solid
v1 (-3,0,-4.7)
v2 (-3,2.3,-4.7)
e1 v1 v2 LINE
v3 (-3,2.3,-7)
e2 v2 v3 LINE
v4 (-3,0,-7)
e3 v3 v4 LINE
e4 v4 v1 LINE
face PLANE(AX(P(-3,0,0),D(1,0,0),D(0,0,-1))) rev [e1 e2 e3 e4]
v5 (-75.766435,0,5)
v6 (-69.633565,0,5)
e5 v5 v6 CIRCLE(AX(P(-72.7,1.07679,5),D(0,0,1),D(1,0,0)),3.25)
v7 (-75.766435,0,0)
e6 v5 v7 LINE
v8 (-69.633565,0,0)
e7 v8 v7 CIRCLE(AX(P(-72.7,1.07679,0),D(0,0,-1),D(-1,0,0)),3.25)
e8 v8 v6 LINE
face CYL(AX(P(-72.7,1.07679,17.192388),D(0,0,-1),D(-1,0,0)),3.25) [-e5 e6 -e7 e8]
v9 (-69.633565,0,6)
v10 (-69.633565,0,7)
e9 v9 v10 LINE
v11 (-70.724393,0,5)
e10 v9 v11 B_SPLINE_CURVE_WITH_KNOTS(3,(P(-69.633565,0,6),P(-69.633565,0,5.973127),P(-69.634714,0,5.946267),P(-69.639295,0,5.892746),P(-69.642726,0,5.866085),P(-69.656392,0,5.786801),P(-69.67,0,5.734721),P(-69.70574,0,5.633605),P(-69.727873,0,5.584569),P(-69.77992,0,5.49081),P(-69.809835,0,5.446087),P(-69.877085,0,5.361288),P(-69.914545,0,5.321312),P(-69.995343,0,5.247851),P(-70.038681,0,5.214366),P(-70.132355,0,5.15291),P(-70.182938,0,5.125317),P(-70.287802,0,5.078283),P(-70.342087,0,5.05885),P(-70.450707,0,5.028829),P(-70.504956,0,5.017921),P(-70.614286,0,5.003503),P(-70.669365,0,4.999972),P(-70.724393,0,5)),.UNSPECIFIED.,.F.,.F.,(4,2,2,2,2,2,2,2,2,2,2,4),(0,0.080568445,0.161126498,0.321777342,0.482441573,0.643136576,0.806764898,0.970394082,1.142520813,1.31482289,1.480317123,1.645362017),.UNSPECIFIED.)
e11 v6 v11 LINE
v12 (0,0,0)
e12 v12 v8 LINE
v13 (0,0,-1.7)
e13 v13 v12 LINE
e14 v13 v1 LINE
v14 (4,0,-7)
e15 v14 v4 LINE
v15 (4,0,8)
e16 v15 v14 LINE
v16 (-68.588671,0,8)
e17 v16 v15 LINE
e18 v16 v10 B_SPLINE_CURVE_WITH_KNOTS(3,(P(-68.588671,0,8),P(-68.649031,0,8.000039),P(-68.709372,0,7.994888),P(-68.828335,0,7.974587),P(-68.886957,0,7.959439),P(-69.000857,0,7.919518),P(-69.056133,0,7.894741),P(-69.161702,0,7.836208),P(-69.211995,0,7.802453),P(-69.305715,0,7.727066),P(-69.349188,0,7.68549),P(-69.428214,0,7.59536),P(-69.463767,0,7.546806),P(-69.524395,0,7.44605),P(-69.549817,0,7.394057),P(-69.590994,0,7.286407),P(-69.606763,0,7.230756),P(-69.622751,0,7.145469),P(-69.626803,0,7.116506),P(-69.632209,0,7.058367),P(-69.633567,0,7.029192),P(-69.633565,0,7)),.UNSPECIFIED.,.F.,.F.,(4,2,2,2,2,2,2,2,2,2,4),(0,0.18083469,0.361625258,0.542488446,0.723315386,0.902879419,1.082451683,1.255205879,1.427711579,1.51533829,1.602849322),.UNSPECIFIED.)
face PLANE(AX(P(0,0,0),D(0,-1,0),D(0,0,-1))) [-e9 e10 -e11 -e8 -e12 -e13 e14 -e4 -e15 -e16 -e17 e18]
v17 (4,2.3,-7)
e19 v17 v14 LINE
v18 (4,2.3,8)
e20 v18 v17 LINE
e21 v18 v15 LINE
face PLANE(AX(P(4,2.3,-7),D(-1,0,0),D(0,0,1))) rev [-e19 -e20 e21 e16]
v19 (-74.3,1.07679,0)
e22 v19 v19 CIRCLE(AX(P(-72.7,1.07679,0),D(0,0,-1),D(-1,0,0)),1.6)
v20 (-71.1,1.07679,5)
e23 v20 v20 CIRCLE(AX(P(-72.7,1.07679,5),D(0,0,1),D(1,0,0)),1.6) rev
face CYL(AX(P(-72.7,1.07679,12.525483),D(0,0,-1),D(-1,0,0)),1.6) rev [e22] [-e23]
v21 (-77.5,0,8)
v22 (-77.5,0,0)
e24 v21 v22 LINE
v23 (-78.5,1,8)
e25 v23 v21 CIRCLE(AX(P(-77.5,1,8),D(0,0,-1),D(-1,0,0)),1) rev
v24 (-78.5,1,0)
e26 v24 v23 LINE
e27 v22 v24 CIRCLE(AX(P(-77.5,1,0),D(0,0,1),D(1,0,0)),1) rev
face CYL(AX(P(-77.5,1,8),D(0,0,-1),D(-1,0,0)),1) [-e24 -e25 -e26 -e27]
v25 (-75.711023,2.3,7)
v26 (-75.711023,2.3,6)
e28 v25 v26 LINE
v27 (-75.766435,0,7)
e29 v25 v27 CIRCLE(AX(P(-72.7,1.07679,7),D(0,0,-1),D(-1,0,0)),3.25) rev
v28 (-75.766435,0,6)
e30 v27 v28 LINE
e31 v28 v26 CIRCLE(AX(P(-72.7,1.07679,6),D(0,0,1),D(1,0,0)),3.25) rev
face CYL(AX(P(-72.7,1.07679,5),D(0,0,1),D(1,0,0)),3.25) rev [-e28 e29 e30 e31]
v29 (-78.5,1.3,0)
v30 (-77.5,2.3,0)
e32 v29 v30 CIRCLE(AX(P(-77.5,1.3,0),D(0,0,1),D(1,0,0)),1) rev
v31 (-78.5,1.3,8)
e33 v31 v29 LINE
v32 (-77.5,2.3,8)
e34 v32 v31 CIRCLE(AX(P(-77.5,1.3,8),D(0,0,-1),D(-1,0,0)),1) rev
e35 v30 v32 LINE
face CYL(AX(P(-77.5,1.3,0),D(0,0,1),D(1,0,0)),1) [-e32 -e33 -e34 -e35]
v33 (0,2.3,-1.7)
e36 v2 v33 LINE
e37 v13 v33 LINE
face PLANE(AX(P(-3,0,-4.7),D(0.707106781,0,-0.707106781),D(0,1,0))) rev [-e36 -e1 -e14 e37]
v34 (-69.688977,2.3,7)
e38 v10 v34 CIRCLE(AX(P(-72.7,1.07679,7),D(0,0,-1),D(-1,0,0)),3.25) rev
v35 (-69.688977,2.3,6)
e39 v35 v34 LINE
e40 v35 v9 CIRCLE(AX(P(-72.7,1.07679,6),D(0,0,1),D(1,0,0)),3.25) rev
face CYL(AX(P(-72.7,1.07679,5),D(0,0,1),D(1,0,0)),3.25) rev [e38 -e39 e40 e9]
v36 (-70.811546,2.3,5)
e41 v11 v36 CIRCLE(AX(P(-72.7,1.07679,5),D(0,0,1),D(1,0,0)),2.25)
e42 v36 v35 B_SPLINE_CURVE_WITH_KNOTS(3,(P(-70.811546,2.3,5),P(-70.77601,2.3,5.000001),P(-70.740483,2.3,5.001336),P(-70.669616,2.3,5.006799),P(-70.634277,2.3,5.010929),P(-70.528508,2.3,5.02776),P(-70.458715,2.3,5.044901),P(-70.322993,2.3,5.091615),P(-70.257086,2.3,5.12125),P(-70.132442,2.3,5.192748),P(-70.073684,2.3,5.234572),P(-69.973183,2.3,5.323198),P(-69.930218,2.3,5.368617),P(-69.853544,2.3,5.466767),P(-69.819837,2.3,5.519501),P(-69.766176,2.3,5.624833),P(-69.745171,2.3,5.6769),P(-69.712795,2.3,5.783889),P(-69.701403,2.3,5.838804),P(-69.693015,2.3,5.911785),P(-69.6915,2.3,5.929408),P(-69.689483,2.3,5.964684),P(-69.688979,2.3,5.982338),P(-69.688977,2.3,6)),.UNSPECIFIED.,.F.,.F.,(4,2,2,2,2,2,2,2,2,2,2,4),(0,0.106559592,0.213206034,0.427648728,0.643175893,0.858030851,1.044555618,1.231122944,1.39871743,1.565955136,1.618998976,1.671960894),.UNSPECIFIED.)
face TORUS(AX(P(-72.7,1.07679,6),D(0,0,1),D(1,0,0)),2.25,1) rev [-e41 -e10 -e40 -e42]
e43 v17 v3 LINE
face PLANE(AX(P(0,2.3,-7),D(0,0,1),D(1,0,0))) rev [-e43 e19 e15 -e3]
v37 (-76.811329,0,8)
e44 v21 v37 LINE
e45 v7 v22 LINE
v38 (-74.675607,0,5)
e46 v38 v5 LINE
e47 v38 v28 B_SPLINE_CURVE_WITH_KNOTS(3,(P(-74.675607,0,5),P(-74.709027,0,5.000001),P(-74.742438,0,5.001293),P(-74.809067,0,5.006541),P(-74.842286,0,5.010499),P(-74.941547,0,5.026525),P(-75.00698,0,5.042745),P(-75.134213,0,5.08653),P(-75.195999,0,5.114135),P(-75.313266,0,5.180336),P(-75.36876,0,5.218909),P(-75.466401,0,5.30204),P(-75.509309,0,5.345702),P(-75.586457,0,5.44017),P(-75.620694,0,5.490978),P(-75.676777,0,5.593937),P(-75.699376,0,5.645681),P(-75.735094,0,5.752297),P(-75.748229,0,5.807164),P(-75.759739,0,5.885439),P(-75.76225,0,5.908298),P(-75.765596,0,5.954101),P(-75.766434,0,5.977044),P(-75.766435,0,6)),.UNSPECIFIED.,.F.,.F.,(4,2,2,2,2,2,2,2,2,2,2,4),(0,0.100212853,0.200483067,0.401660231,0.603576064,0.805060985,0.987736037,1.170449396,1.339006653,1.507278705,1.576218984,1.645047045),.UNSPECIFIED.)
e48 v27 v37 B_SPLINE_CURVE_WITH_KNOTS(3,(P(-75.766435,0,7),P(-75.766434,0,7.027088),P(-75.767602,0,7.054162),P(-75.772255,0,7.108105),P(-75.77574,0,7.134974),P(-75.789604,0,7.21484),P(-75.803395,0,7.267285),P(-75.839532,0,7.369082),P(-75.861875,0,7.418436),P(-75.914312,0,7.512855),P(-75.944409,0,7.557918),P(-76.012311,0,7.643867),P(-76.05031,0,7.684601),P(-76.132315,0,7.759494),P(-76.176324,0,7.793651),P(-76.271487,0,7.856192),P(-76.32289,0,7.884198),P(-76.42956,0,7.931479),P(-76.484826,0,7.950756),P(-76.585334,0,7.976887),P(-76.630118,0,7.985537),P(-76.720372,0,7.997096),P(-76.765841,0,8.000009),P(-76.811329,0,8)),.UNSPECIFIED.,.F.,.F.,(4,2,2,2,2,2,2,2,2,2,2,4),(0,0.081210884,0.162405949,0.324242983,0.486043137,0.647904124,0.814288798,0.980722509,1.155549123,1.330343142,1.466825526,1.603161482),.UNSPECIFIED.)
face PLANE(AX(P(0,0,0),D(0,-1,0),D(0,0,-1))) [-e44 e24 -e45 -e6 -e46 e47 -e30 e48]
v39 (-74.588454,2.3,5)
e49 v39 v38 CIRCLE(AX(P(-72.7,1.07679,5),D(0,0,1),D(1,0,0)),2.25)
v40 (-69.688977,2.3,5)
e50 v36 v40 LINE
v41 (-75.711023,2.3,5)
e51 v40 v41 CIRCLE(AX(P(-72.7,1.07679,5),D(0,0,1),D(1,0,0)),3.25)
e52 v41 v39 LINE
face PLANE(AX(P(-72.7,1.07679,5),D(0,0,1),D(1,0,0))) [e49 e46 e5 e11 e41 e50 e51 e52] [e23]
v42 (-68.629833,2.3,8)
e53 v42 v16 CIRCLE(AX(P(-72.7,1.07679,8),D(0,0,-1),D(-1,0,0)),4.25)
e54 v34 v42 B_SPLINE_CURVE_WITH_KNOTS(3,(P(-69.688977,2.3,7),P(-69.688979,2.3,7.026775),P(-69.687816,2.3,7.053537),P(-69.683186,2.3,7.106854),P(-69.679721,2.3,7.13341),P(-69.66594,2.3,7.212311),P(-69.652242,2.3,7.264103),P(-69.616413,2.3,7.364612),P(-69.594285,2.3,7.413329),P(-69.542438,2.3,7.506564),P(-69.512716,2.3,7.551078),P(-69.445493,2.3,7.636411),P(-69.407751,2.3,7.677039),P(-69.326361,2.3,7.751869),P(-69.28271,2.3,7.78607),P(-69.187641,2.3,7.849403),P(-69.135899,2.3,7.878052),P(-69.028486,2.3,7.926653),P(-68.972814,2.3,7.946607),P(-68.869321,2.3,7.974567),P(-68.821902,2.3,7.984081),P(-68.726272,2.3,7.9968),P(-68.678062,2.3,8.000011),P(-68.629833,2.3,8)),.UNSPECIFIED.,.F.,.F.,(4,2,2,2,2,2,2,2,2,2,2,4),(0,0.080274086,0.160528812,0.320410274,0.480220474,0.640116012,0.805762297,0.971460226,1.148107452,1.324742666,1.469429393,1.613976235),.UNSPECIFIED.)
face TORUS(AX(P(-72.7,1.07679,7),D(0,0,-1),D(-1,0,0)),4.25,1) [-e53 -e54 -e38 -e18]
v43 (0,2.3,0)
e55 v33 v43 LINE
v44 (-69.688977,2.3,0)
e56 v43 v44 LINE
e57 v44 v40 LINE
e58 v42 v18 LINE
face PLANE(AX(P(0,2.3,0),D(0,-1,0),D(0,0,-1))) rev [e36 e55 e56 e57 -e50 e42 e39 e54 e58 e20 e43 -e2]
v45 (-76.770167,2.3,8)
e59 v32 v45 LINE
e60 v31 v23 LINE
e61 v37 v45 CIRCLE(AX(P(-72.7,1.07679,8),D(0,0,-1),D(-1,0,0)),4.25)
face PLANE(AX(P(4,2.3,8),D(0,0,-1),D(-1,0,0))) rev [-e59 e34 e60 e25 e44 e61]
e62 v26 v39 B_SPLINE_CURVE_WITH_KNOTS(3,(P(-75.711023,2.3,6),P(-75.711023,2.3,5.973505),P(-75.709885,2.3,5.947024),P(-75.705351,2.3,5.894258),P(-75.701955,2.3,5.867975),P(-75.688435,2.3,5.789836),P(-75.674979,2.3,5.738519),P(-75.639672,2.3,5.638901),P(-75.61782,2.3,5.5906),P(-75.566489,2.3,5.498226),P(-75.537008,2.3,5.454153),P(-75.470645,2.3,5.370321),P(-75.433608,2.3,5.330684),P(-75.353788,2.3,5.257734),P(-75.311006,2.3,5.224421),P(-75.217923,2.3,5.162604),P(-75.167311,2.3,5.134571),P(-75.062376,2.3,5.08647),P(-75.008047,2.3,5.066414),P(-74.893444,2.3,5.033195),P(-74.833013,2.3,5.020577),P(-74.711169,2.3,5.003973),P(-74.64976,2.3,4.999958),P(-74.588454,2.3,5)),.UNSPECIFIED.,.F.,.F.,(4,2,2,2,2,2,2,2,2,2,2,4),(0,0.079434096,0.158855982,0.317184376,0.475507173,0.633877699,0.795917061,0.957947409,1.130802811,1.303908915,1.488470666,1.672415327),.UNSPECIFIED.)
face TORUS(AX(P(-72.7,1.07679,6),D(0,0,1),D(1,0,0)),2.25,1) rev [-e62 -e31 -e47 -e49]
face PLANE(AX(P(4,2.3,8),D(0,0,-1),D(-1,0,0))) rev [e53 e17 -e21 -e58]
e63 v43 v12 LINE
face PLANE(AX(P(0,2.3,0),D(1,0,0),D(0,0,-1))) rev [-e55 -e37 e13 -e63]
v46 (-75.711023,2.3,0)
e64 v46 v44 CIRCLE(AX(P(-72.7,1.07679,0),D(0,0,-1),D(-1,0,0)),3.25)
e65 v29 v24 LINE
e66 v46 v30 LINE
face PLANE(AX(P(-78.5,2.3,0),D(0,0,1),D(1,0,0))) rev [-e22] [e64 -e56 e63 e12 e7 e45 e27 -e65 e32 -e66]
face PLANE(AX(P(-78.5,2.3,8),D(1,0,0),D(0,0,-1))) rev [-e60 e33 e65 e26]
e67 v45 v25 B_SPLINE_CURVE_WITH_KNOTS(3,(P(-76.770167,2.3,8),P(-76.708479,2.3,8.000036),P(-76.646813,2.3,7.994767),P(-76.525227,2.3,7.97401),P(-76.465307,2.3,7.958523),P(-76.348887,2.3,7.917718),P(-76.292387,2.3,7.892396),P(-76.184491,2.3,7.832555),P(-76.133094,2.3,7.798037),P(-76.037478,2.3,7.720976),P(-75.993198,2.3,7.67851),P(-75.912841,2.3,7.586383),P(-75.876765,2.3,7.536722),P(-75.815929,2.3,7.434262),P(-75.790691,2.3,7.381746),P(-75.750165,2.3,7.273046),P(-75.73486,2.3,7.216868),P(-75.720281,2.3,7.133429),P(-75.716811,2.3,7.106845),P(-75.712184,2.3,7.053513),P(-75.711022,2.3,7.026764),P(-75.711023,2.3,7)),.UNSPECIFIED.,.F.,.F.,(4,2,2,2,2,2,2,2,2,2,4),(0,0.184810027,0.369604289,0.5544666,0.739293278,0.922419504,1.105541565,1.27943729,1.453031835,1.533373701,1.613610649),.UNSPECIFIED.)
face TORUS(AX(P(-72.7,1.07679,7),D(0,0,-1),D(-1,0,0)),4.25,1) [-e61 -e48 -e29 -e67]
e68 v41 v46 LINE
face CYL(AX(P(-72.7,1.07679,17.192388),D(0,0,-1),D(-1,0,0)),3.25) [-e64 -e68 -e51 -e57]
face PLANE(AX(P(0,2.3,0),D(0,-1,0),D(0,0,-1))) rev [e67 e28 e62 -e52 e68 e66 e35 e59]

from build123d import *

# Parameters (mm, degrees)
BOSS_EXTRUDE1_DEPTH = 2.3
SKETCH2_R           = 3.25
BOSS_EXTRUDE2_DEPTH = 8
SKETCH3_R           = 1.6
CUT_EXTRUDE1_DEPTH  = 8
CUT_EXTRUDE2_START  = -3
SKETCH4_R           = 3.25
CUT_EXTRUDE2_DEPTH  = 3
FILLET1_R           = 1
SKETCH5_W           = 5.3
SKETCH5_H           = 2.3
BOSS_EXTRUDE3_DEPTH = 3
CHAMFER1_SIZE       = 3


# Some blends are built 0.0001 mm under size
with BuildPart() as part:
    # Sketch1 → Boss-Extrude1 (new body)
    with BuildSketch(Plane(origin=(0, 0, 0), x_dir=(1, 0, 0), z_dir=(0, 1, 0))):
        Polygon((-78.5, 0), (0, 0), (0, 7), (4, 7), (4, -8), (-78.5, -8), align=None)
    extrude(amount=BOSS_EXTRUDE1_DEPTH)

    # Sketch2 → Boss-Extrude2 (add)
    with BuildSketch(Plane(origin=(0, 0, 0), x_dir=(-1, 0, 0), z_dir=(0, 0, -1))):
        with Locations((72.7, 1.076790216)):
            Circle(SKETCH2_R)
    extrude(amount=-BOSS_EXTRUDE2_DEPTH)

    # Sketch3 → Cut-Extrude1 (cut)
    with BuildSketch(Plane(origin=(0, 0, 0), x_dir=(-1, 0, 0), z_dir=(0, 0, -1))):
        with Locations((72.7, 1.076790216)):
            Circle(SKETCH3_R)
    extrude(amount=-CUT_EXTRUDE1_DEPTH, mode=Mode.SUBTRACT)

    # Sketch4 → Cut-Extrude2 (cut)
    with BuildSketch(Plane.XY.offset(8).offset(CUT_EXTRUDE2_START)):
        with Locations((-72.7, 1.076790216)):
            Circle(SKETCH4_R)
    extrude(amount=CUT_EXTRUDE2_DEPTH, mode=Mode.SUBTRACT)

    # Fillet1
    # the kernel refuses this fillet: 1 mm, written as the material it adds along each edge
    with BuildSketch(Plane(origin=(-72.7, 1.076790216, 5), x_dir=(-0.40375953104752016, 0.9148651491276113, 0), z_dir=(0.9148651491276113, 0.40375953104752016, 0))) as fillet1_piece_1_section:
        with BuildLine():
            CenterArc((3.25 - FILLET1_R, FILLET1_R), FILLET1_R, 270, 90)
            Line((3.25, FILLET1_R), (3.25, 0))
            Line((3.25, 0), (3.25 - FILLET1_R, 0))
        make_face()
    fillet1_piece_1 = revolve(axis=Axis((-72.7, 1.076790216, 5), (0, 0, 1)), revolution_arc=129.612934005, mode=Mode.PRIVATE)
    fillet1_piece_1 = split(fillet1_piece_1, bisect_by=Plane(origin=(-75.648358943, 2.3, 5.222958047), z_dir=(0, -1, 0)), keep=Keep.TOP, mode=Mode.PRIVATE)
    fillet1_piece_1 = split(fillet1_piece_1, bisect_by=Plane(origin=(-75.648358943, 0, 5.222958047), z_dir=(0, 1, 0)), keep=Keep.TOP, mode=Mode.PRIVATE)
    add(fillet1_piece_1)
    with BuildSketch(Plane(origin=(-72.7, 1.076790216, 5), x_dir=(0.44734781927350936, -0.8943600665231177, 0), z_dir=(-0.8943600665231177, -0.44734781927350936, 0))) as fillet1_piece_2_section:
        with BuildLine():
            CenterArc((3.25 - FILLET1_R, FILLET1_R), FILLET1_R, 270, 90)
            Line((3.25, FILLET1_R), (3.25, 0))
            Line((3.25, 0), (3.25 - FILLET1_R, 0))
        make_face()
    fillet1_piece_2 = revolve(axis=Axis((-72.7, 1.076790216, 5), (0, 0, 1)), revolution_arc=129.612934005, mode=Mode.PRIVATE)
    fillet1_piece_2 = split(fillet1_piece_2, bisect_by=Plane(origin=(-69.751641159, 2.3, 5.222958106), z_dir=(0, -1, 0)), keep=Keep.TOP, mode=Mode.PRIVATE)
    fillet1_piece_2 = split(fillet1_piece_2, bisect_by=Plane(origin=(-69.751641159, 0, 5.222958106), z_dir=(0, 1, 0)), keep=Keep.TOP, mode=Mode.PRIVATE)
    add(fillet1_piece_2)
    # the kernel refuses this fillet: 1 mm, written as the material it takes off along each edge
    with BuildSketch(Plane(origin=(-78.5, 2.3, 10.5), x_dir=(0, -1, 0), z_dir=(0, 0, -1)), Plane(origin=(-78.5, 0, 10.5), x_dir=(1, 0, 0), z_dir=(0, 0, -1))) as fillet1_2_piece_1:
        with BuildLine():
            CenterArc((FILLET1_R, -FILLET1_R), FILLET1_R, 90, 90)
            Line((0, -FILLET1_R), (0, 0))
            Line((0, 0), (FILLET1_R, 0))
        make_face()
    extrude(amount=13, mode=Mode.SUBTRACT)
    with BuildSketch(Plane(origin=(-72.7, 1.076790216, 8), x_dir=(-0.40375953104750745, 0.914865149127617, 0), z_dir=(0.914865149127617, 0.40375953104750745, 0))) as fillet1_2_piece_2:
        with BuildLine():
            CenterArc((3.25 + FILLET1_R, -FILLET1_R), FILLET1_R, 90, 90)
            Line((3.25, -FILLET1_R), (3.25, 0))
            Line((3.25, 0), (3.25 + FILLET1_R, 0))
        make_face()
    revolve(axis=Axis((-72.7, 1.076790216, 8), (0, 0, 1)), revolution_arc=129.612934005, mode=Mode.SUBTRACT)
    with BuildSketch(Plane(origin=(-72.7, 1.076790216, 8), x_dir=(0.44734781927345224, -0.8943600665231464, 7.1054273576009774e-15), z_dir=(-0.8943600665231464, -0.44734781927345224, 3.689898674328445e-15))) as fillet1_2_piece_3:
        with BuildLine():
            CenterArc((3.25 + FILLET1_R, -FILLET1_R), FILLET1_R, 90, 90)
            Line((3.25 + FILLET1_R, 0), (3.25, 0))
            Line((3.25, 0), (3.25, -FILLET1_R))
        make_face()
    revolve(axis=Axis((-72.7, 1.076790216, 8), (0, 0, 1)), revolution_arc=129.612934005, mode=Mode.SUBTRACT)

    # Sketch5 → Boss-Extrude3 (add)
    with BuildSketch(Plane.ZY):
        with Locations((-4.35, 1.15)):
            Rectangle(SKETCH5_W, SKETCH5_H)
    extrude(amount=BOSS_EXTRUDE3_DEPTH)

    # Chamfer1
    chamfer1_edges = [part.edges().sort_by_distance(p)[0] for p in [
        (-3, 1.15, -1.7),
    ]]
    chamfer(chamfer1_edges, length=CHAMFER1_SIZE - 0.0001)  # a hair under: the kernel refuses the full size


solid = part.part
